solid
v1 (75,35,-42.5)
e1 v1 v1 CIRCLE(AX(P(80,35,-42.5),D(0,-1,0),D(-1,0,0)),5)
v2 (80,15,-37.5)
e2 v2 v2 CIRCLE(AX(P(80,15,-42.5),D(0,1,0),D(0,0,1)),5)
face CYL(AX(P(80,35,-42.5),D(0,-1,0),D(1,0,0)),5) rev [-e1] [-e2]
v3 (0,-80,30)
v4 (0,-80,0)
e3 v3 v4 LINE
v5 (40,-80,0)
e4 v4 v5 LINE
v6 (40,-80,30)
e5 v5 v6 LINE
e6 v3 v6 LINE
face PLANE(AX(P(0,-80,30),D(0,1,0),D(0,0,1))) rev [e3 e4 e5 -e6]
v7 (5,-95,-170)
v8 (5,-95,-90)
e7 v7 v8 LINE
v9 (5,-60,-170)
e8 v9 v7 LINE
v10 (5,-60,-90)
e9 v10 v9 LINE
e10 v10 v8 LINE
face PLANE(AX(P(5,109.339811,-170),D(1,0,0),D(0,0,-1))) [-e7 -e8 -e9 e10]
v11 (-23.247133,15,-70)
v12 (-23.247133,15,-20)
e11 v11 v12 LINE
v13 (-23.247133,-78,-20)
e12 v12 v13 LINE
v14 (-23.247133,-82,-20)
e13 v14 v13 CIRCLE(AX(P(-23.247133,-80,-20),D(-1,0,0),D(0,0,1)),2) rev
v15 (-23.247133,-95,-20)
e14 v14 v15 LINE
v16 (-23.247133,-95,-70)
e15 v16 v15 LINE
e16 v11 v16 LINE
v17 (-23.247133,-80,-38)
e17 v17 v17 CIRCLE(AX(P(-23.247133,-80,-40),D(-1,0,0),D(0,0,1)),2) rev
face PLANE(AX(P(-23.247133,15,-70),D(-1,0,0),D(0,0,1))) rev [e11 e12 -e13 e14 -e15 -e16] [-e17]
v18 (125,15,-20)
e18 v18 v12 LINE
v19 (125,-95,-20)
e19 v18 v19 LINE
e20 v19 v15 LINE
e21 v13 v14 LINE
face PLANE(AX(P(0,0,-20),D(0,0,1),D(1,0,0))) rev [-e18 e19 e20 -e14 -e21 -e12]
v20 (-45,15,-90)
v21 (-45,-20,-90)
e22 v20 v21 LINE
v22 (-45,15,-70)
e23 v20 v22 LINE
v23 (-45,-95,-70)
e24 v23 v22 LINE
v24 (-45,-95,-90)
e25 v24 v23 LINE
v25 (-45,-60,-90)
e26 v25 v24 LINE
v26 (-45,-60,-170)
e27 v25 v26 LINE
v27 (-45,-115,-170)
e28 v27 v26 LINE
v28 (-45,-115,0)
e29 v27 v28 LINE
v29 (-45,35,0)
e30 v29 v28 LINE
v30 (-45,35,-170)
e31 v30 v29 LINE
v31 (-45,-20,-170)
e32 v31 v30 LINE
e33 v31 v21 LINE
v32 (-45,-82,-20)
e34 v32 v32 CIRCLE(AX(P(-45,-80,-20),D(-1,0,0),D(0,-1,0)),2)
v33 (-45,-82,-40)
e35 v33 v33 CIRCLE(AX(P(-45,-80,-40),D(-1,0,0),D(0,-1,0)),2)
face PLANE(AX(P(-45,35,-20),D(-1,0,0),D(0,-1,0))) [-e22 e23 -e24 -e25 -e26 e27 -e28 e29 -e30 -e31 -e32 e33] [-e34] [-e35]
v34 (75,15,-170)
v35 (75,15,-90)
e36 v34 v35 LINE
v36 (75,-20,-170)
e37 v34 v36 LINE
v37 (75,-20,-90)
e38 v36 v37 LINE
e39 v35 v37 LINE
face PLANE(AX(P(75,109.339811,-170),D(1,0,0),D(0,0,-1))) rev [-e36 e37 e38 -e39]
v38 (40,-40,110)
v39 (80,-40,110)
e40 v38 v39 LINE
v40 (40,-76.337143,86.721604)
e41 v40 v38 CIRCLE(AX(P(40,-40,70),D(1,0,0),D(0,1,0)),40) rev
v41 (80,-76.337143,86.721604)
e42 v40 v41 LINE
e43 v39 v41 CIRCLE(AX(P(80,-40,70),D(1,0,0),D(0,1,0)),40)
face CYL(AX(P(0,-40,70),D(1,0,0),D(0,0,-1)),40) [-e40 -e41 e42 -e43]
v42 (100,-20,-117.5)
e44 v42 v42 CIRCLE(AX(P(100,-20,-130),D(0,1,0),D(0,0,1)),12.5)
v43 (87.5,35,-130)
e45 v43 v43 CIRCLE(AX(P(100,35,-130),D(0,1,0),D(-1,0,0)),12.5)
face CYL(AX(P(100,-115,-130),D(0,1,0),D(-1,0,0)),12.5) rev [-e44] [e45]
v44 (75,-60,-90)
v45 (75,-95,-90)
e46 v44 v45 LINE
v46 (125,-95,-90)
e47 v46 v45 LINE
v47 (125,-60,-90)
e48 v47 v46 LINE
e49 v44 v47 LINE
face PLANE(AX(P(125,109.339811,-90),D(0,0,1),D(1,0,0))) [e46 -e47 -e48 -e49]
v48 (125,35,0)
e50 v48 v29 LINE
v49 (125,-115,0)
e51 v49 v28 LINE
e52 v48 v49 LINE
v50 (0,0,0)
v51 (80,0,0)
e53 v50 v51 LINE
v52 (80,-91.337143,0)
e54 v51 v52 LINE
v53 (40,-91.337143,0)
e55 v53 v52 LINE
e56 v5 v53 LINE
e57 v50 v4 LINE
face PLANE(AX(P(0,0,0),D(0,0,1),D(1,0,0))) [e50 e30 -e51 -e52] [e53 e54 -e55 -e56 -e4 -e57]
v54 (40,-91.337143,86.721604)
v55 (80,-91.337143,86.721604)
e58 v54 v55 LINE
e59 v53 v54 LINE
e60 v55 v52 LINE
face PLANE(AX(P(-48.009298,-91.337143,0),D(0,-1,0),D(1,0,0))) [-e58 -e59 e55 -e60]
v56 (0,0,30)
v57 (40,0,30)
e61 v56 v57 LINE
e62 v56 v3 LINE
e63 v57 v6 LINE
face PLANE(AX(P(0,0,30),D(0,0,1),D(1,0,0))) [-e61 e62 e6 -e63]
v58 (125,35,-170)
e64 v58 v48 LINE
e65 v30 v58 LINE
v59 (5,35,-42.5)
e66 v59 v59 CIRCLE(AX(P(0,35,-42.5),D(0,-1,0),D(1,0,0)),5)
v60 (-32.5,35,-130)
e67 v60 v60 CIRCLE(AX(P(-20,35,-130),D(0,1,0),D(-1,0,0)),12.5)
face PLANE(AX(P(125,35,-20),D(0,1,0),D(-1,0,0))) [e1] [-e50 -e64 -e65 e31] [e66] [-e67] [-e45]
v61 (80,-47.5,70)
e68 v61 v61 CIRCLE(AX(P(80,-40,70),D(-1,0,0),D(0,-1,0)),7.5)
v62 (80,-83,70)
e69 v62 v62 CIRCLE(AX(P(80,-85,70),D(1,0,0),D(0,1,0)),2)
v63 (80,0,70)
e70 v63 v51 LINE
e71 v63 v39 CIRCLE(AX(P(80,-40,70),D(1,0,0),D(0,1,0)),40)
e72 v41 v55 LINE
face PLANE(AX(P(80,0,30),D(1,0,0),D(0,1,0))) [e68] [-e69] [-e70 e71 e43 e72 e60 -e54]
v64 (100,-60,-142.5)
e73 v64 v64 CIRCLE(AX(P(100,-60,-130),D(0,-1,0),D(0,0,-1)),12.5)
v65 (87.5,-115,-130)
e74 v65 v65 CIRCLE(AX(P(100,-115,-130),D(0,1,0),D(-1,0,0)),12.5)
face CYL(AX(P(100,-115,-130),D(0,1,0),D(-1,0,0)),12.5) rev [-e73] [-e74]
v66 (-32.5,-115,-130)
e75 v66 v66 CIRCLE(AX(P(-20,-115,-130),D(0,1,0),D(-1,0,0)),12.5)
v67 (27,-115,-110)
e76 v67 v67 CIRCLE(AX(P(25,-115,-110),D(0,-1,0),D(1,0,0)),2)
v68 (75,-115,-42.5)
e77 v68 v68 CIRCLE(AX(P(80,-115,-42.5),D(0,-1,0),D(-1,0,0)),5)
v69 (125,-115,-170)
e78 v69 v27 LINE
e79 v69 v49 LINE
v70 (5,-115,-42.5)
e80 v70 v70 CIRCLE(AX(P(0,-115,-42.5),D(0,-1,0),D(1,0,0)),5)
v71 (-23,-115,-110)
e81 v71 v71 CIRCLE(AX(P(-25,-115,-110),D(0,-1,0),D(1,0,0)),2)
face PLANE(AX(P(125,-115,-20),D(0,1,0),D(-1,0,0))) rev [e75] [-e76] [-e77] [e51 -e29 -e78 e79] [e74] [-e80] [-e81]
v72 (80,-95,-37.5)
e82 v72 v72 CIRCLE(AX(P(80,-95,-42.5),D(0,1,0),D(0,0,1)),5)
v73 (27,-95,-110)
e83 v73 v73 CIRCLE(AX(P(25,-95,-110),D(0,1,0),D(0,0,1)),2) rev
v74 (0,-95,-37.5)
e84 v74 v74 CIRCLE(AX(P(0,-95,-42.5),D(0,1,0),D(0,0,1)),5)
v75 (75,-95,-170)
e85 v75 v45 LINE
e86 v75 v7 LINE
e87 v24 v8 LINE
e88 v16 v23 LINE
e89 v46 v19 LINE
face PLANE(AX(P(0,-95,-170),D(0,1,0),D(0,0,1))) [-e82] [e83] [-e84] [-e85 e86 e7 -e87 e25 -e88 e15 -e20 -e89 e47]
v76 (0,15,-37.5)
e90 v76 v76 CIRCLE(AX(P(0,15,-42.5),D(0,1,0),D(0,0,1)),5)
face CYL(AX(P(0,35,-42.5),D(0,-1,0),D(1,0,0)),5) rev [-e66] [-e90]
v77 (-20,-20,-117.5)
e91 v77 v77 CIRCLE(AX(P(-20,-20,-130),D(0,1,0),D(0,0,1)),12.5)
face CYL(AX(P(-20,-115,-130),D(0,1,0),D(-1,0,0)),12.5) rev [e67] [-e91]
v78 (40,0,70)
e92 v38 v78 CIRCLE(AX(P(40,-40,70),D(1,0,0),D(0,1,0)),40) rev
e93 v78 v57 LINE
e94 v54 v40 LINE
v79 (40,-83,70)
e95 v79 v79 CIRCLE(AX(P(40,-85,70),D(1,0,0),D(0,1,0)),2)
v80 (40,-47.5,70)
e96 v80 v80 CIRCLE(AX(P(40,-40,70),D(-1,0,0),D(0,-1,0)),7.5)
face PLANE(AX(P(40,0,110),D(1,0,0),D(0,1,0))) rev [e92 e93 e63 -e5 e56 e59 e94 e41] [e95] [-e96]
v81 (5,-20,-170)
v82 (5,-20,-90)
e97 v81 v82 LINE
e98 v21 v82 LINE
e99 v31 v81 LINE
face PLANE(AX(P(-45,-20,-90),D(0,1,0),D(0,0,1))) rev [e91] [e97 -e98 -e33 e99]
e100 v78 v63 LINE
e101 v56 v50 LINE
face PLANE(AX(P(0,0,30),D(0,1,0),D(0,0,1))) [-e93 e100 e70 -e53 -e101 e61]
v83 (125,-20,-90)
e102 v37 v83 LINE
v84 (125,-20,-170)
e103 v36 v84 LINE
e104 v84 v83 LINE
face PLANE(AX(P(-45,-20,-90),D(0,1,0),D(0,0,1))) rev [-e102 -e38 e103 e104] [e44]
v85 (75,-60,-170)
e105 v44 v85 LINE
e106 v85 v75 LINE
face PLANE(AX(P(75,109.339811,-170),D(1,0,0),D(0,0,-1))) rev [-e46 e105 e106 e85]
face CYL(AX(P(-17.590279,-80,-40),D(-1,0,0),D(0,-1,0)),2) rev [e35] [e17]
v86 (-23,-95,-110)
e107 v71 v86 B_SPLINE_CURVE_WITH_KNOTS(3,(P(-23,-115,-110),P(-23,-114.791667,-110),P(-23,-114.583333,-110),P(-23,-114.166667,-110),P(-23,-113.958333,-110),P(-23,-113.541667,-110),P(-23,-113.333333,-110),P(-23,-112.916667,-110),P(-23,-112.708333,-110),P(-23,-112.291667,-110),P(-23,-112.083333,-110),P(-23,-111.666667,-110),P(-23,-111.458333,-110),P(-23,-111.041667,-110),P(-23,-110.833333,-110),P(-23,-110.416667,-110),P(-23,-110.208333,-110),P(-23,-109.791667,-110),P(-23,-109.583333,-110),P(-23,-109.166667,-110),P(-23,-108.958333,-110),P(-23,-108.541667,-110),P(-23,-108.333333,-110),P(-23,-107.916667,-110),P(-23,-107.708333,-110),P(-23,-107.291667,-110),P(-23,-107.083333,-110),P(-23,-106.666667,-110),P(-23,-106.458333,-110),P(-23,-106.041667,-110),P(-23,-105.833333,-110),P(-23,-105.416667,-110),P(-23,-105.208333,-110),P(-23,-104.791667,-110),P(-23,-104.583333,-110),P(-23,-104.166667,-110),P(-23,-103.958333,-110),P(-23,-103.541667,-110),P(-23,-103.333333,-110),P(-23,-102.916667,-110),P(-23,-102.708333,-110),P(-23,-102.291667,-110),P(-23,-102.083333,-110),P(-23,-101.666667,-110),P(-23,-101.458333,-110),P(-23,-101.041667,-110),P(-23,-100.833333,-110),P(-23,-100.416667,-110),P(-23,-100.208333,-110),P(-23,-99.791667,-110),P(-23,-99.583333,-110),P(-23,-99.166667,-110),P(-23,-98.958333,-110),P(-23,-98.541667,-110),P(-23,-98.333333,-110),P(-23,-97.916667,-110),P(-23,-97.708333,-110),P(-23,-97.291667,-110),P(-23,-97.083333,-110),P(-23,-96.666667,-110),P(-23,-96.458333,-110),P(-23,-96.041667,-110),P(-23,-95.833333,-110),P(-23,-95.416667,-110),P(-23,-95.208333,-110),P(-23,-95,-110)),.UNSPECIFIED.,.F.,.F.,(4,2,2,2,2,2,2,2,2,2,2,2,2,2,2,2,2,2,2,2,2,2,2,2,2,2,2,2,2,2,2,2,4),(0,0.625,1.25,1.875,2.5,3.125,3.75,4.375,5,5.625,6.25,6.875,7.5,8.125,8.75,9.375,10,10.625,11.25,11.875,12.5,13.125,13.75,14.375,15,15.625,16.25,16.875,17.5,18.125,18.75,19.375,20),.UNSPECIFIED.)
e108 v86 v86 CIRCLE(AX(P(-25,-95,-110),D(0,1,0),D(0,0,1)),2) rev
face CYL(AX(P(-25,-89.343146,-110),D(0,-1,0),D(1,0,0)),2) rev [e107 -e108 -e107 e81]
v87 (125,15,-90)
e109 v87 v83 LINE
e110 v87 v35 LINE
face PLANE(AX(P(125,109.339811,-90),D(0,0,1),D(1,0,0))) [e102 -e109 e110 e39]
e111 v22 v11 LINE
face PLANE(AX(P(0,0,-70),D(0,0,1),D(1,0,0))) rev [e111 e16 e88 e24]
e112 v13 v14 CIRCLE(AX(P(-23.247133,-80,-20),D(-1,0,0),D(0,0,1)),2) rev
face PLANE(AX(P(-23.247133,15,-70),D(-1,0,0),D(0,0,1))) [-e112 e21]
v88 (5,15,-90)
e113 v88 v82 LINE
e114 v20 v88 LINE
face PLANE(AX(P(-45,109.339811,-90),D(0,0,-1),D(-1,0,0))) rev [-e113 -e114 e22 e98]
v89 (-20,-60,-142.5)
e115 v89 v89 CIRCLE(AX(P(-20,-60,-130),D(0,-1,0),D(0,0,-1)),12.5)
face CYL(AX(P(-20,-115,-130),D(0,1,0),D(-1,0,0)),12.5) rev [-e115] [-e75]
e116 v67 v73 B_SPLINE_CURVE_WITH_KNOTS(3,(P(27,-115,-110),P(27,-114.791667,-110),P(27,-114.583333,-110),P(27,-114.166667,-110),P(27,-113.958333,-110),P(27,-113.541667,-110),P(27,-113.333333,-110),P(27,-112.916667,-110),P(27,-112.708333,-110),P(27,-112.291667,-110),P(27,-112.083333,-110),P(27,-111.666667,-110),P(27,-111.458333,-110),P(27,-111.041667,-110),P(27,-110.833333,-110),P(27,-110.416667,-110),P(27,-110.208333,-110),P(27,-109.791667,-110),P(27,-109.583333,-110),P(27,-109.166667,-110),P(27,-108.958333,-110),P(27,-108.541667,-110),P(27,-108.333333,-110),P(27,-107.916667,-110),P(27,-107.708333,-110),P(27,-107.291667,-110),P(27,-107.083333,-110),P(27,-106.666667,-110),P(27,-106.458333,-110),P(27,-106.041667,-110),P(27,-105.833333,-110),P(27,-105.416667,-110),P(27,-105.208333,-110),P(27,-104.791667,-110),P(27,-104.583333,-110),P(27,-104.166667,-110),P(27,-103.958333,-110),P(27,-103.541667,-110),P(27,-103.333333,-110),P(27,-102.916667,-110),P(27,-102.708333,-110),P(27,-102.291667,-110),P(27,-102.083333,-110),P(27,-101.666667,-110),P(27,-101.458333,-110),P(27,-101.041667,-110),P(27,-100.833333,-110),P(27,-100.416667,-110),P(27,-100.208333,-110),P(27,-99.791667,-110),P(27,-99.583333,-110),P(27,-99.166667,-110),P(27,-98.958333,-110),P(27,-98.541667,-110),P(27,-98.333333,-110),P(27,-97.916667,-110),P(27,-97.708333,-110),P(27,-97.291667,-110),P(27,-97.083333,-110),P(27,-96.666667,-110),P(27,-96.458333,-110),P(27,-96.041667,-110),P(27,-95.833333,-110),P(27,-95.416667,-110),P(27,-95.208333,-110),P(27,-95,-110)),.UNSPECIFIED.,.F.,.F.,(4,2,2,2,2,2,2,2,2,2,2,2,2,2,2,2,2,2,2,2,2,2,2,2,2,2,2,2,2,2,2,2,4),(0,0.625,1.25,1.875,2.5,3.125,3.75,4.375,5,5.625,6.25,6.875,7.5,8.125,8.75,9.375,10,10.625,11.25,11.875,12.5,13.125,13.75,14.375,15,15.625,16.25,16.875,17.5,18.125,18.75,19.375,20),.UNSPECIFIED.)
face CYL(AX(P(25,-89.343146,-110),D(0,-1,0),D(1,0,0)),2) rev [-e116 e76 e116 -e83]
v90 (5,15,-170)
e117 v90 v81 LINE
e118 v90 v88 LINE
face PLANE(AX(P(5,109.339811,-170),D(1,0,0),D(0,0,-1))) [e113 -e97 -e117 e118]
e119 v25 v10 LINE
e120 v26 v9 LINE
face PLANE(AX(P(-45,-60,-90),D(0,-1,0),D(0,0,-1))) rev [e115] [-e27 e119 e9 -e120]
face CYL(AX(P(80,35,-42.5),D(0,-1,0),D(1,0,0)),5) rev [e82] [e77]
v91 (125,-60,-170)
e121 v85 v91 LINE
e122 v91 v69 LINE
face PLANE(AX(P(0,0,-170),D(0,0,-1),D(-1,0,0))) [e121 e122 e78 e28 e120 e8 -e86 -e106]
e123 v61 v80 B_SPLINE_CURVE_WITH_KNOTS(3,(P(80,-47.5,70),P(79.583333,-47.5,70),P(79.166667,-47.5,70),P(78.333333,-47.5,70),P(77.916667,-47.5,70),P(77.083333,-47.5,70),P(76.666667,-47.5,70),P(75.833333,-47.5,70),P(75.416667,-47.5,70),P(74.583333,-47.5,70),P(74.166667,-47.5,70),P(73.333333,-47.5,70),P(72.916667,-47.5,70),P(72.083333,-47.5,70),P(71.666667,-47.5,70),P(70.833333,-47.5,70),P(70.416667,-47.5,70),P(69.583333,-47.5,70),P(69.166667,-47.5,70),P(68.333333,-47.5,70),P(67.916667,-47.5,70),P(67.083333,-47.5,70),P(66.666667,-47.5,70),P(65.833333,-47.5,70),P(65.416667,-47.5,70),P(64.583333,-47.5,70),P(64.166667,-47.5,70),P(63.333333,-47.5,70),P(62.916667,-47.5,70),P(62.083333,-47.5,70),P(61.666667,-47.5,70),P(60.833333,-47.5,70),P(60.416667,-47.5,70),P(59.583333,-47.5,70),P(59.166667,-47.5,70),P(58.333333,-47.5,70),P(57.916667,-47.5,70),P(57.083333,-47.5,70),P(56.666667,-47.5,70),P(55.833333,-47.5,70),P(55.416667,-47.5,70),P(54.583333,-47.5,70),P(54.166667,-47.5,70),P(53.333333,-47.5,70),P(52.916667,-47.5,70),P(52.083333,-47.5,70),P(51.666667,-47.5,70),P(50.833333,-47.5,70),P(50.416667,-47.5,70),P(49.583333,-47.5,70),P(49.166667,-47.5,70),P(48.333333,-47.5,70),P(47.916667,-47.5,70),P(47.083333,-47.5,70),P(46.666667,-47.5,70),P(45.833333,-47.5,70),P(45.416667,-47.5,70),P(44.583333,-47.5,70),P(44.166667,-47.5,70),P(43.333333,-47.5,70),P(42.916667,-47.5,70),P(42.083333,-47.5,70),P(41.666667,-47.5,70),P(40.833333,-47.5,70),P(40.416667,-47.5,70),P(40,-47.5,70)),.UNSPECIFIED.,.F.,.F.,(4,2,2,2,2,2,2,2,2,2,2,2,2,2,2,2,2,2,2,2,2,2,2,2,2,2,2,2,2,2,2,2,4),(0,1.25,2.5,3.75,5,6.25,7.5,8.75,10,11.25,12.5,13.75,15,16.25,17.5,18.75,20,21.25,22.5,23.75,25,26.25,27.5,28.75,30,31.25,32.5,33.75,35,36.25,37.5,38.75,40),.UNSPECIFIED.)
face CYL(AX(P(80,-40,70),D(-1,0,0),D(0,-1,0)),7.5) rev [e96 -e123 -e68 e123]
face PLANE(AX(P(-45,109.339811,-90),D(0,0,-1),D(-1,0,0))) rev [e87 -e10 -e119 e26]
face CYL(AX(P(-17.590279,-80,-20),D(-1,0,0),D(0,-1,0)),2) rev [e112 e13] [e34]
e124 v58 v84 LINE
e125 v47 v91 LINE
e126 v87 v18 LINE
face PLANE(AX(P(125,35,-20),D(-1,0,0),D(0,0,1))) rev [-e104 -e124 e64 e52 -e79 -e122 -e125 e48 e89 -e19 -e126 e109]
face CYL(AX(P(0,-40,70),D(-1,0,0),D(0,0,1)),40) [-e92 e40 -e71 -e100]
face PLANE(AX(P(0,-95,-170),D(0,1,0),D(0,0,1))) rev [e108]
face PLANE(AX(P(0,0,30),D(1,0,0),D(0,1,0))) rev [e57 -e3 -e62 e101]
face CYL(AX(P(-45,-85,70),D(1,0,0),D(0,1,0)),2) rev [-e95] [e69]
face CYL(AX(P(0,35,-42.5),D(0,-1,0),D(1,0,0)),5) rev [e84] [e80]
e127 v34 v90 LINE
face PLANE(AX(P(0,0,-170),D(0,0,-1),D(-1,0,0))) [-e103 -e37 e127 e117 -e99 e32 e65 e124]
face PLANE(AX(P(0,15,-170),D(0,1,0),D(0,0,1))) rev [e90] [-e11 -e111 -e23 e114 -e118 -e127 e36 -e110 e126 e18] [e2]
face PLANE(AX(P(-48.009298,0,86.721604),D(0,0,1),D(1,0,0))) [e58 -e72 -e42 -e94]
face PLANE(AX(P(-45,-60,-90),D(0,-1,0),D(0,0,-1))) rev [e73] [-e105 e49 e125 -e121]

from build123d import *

# Parameters (mm, degrees)
SKETCH_1_W          = 25
SKETCH_1_H          = 80
SKETCH_1_W_2        = 30
EXTRUDE_1_DEPTH     = 30
SKETCH_2_W          = 40
SKETCH_2_H          = 80
EXTRUDE_2_DEPTH     = 80
FILLET_1_R          = 40
SKETCH_3_R          = 7.5
CUT_EXTRUDE_1_DEPTH = 142.774468788
SKETCH_6_W          = 170
SKETCH_6_H          = 150
EXTRUDE_5_DEPTH     = 20
SKETCH_7_W          = 170
SKETCH_7_H          = 20
EXTRUDE_6_DEPTH     = 150
EXTRUDE_7_DEPTH     = 40
SKETCH_10_R         = 2
CUT_EXTRUDE_3_DEPTH = 241.312296814
SKETCH_11_W         = 50
SKETCH_11_H         = 80
EXTRUDE_8_DEPTH     = 110
SKETCH_12_W         = 80
SKETCH_12_H         = 40
CUT_EXTRUDE_4_DEPTH = 267.505159425
SKETCH_13_R         = 12.5
CUT_EXTRUDE_5_DEPTH = 259.89186932
SKETCH_14_R         = 5
CUT_EXTRUDE_6_DEPTH = 259.89186932
SKETCH_15_W         = 21.752867029
SKETCH_15_H         = 110
EXTRUDE_9_DEPTH     = 50
SKETCH_16_R         = 2
CUT_EXTRUDE_7_DEPTH = 21.752867029
SKETCH_17_R         = 2
CUT_EXTRUDE_8_DEPTH = 20


with BuildPart() as part:
    # 草图1 → 凸台-拉伸1 (new body)
    with BuildSketch(Plane.XY):
        with Locations((12.5, -40)):
            Rectangle(SKETCH_1_W, SKETCH_1_H)
        with Locations((40, -40)):
            Rectangle(SKETCH_1_W_2, SKETCH_1_H)
        with Locations((67.5, -40)):
            Rectangle(SKETCH_1_W, SKETCH_1_H)
    extrude(amount=EXTRUDE_1_DEPTH)

    # 草图2 → 凸台-拉伸2 (add)
    with BuildSketch(Plane.XY.offset(30)):
        with Locations((60, -40)):
            Rectangle(SKETCH_2_W, SKETCH_2_H)
    extrude(amount=EXTRUDE_2_DEPTH)

    # 圆角1
    fillet_1_edges = [part.edges().sort_by_distance(p)[0] for p in [
        (60, 0, 110),
        (60, -80, 110),
    ]]
    fillet(fillet_1_edges, radius=FILLET_1_R - 0.0001)  # a hair under: the kernel refuses the full size

    # 草图3 → 切除-拉伸1 (cut, through all)
    with BuildSketch(Plane.ZY.offset(-40)):
        with Locations(Location((70, -40, 0), (0, 0, 270))):
            Circle(SKETCH_3_R)
    extrude(amount=-CUT_EXTRUDE_1_DEPTH, mode=Mode.SUBTRACT)



with BuildPart() as body_2:
    # 草图6 → 凸台-拉伸5 (new body)
    with BuildSketch(Plane(origin=(0, 0, 0), x_dir=(-1, 0, 0), z_dir=(0, 0, -1))):
        with Locations((-40, -40)):
            Rectangle(SKETCH_6_W, SKETCH_6_H)
    extrude(amount=EXTRUDE_5_DEPTH)

    # 草图7 → 凸台-拉伸6 (add)
    with BuildSketch(Plane(origin=(0, 0, -20), x_dir=(-1, 0, 0), z_dir=(0, 0, -1))):
        with Locations((-40, 25)):
            Rectangle(SKETCH_7_W, SKETCH_7_H)
        with Locations((-40, -105)):
            Rectangle(SKETCH_7_W, SKETCH_7_H)
    extrude(amount=EXTRUDE_6_DEPTH)


with BuildPart() as part_1:
    add(part.part)

    add(body_2.part)  # 凸台-拉伸7 merges body 2
    # 草图9 → 凸台-拉伸7 (add)
    with BuildSketch(Plane(origin=(80, 0, 0), x_dir=(0, 0, -1), z_dir=(1, 0, 0))):
        with BuildLine():
            ThreePointArc((-70, -80), (-78.559038333, -79.073557079), (-86.721603642, -76.337143141))
            Line((-86.721603642, -76.337143141), (-86.721603642, -91.337143141))
            Line((-86.721603642, -91.337143141), (0, -91.337143141))
            Line((0, -91.337143141), (0, -80))
            Line((0, -80), (-70, -80))
        make_face()
    extrude(amount=-EXTRUDE_7_DEPTH)

    # 草图10 → 切除-拉伸3 (cut, through all)
    with BuildSketch(Plane(origin=(80, 0, 0), x_dir=(0, 0, -1), z_dir=(1, 0, 0))):
        with Locations(Location((-70, -85, 0), (0, 0, 90))):
            Circle(SKETCH_10_R)
    extrude(amount=-CUT_EXTRUDE_3_DEPTH, mode=Mode.SUBTRACT)

    # 草图11 → 凸台-拉伸8 (add)
    with BuildSketch(Plane(origin=(0, -95, 0), x_dir=(1, 0, 0), z_dir=(0, 1, 0))):
        with Locations((-20, 130)):
            Rectangle(SKETCH_11_W, SKETCH_11_H)
        with Locations((100, 130)):
            Rectangle(SKETCH_11_W, SKETCH_11_H)
    extrude(amount=EXTRUDE_8_DEPTH)

    # 草图12 → 切除-拉伸4 (cut, through all)
    with BuildSketch(Plane(origin=(125, 0, 0), x_dir=(0, 0, -1), z_dir=(1, 0, 0))):
        with Locations((130, -40)):
            Rectangle(SKETCH_12_W, SKETCH_12_H)
    extrude(amount=-CUT_EXTRUDE_4_DEPTH, mode=Mode.SUBTRACT)

    # 草图13 → 切除-拉伸5 (cut, through all)
    with BuildSketch(Plane(origin=(0, 35, 0), x_dir=(1, 0, 0), z_dir=(0, 1, 0))):
        with Locations(Location((100, 130, 0), (0, 0, 180))):
            Circle(SKETCH_13_R)
        with Locations(Location((-20, 130, 0), (0, 0, 180))):
            Circle(SKETCH_13_R)
    extrude(amount=-CUT_EXTRUDE_5_DEPTH, mode=Mode.SUBTRACT)

    # 草图14 → 切除-拉伸6 (cut, through all)
    with BuildSketch(Plane.XZ.offset(115)):
        with Locations((0, -42.5)):
            Circle(SKETCH_14_R)
        with Locations(Location((80, -42.5, 0), (0, 0, 90))):
            Circle(SKETCH_14_R)
    extrude(amount=-CUT_EXTRUDE_6_DEPTH, mode=Mode.SUBTRACT)

    # 草图15 → 凸台-拉伸9 (add)
    with BuildSketch(Plane(origin=(0, 0, -20), x_dir=(-1, 0, 0), z_dir=(0, 0, -1))):
        with Locations((34.123566485, -40)):
            Rectangle(SKETCH_15_W, SKETCH_15_H)
    extrude(amount=EXTRUDE_9_DEPTH)

    # 草图16 → 切除-拉伸7 (cut)
    with BuildSketch(Plane.ZY.offset(45)):
        with Locations(Location((-20, -80, 0), (0, 0, 270))):
            Circle(SKETCH_16_R)
        with Locations(Location((-40, -80, 0), (0, 0, 270))):
            Circle(SKETCH_16_R)
    extrude(amount=-CUT_EXTRUDE_7_DEPTH, mode=Mode.SUBTRACT)

    # 草图17 → 切除-拉伸8 (cut)
    with BuildSketch(Plane.XZ.offset(115)):
        with Locations((-25, -110)):
            Circle(SKETCH_17_R)
        with Locations((25, -110)):
            Circle(SKETCH_17_R)
    extrude(amount=-CUT_EXTRUDE_8_DEPTH, mode=Mode.SUBTRACT)


solid = part_1.part
